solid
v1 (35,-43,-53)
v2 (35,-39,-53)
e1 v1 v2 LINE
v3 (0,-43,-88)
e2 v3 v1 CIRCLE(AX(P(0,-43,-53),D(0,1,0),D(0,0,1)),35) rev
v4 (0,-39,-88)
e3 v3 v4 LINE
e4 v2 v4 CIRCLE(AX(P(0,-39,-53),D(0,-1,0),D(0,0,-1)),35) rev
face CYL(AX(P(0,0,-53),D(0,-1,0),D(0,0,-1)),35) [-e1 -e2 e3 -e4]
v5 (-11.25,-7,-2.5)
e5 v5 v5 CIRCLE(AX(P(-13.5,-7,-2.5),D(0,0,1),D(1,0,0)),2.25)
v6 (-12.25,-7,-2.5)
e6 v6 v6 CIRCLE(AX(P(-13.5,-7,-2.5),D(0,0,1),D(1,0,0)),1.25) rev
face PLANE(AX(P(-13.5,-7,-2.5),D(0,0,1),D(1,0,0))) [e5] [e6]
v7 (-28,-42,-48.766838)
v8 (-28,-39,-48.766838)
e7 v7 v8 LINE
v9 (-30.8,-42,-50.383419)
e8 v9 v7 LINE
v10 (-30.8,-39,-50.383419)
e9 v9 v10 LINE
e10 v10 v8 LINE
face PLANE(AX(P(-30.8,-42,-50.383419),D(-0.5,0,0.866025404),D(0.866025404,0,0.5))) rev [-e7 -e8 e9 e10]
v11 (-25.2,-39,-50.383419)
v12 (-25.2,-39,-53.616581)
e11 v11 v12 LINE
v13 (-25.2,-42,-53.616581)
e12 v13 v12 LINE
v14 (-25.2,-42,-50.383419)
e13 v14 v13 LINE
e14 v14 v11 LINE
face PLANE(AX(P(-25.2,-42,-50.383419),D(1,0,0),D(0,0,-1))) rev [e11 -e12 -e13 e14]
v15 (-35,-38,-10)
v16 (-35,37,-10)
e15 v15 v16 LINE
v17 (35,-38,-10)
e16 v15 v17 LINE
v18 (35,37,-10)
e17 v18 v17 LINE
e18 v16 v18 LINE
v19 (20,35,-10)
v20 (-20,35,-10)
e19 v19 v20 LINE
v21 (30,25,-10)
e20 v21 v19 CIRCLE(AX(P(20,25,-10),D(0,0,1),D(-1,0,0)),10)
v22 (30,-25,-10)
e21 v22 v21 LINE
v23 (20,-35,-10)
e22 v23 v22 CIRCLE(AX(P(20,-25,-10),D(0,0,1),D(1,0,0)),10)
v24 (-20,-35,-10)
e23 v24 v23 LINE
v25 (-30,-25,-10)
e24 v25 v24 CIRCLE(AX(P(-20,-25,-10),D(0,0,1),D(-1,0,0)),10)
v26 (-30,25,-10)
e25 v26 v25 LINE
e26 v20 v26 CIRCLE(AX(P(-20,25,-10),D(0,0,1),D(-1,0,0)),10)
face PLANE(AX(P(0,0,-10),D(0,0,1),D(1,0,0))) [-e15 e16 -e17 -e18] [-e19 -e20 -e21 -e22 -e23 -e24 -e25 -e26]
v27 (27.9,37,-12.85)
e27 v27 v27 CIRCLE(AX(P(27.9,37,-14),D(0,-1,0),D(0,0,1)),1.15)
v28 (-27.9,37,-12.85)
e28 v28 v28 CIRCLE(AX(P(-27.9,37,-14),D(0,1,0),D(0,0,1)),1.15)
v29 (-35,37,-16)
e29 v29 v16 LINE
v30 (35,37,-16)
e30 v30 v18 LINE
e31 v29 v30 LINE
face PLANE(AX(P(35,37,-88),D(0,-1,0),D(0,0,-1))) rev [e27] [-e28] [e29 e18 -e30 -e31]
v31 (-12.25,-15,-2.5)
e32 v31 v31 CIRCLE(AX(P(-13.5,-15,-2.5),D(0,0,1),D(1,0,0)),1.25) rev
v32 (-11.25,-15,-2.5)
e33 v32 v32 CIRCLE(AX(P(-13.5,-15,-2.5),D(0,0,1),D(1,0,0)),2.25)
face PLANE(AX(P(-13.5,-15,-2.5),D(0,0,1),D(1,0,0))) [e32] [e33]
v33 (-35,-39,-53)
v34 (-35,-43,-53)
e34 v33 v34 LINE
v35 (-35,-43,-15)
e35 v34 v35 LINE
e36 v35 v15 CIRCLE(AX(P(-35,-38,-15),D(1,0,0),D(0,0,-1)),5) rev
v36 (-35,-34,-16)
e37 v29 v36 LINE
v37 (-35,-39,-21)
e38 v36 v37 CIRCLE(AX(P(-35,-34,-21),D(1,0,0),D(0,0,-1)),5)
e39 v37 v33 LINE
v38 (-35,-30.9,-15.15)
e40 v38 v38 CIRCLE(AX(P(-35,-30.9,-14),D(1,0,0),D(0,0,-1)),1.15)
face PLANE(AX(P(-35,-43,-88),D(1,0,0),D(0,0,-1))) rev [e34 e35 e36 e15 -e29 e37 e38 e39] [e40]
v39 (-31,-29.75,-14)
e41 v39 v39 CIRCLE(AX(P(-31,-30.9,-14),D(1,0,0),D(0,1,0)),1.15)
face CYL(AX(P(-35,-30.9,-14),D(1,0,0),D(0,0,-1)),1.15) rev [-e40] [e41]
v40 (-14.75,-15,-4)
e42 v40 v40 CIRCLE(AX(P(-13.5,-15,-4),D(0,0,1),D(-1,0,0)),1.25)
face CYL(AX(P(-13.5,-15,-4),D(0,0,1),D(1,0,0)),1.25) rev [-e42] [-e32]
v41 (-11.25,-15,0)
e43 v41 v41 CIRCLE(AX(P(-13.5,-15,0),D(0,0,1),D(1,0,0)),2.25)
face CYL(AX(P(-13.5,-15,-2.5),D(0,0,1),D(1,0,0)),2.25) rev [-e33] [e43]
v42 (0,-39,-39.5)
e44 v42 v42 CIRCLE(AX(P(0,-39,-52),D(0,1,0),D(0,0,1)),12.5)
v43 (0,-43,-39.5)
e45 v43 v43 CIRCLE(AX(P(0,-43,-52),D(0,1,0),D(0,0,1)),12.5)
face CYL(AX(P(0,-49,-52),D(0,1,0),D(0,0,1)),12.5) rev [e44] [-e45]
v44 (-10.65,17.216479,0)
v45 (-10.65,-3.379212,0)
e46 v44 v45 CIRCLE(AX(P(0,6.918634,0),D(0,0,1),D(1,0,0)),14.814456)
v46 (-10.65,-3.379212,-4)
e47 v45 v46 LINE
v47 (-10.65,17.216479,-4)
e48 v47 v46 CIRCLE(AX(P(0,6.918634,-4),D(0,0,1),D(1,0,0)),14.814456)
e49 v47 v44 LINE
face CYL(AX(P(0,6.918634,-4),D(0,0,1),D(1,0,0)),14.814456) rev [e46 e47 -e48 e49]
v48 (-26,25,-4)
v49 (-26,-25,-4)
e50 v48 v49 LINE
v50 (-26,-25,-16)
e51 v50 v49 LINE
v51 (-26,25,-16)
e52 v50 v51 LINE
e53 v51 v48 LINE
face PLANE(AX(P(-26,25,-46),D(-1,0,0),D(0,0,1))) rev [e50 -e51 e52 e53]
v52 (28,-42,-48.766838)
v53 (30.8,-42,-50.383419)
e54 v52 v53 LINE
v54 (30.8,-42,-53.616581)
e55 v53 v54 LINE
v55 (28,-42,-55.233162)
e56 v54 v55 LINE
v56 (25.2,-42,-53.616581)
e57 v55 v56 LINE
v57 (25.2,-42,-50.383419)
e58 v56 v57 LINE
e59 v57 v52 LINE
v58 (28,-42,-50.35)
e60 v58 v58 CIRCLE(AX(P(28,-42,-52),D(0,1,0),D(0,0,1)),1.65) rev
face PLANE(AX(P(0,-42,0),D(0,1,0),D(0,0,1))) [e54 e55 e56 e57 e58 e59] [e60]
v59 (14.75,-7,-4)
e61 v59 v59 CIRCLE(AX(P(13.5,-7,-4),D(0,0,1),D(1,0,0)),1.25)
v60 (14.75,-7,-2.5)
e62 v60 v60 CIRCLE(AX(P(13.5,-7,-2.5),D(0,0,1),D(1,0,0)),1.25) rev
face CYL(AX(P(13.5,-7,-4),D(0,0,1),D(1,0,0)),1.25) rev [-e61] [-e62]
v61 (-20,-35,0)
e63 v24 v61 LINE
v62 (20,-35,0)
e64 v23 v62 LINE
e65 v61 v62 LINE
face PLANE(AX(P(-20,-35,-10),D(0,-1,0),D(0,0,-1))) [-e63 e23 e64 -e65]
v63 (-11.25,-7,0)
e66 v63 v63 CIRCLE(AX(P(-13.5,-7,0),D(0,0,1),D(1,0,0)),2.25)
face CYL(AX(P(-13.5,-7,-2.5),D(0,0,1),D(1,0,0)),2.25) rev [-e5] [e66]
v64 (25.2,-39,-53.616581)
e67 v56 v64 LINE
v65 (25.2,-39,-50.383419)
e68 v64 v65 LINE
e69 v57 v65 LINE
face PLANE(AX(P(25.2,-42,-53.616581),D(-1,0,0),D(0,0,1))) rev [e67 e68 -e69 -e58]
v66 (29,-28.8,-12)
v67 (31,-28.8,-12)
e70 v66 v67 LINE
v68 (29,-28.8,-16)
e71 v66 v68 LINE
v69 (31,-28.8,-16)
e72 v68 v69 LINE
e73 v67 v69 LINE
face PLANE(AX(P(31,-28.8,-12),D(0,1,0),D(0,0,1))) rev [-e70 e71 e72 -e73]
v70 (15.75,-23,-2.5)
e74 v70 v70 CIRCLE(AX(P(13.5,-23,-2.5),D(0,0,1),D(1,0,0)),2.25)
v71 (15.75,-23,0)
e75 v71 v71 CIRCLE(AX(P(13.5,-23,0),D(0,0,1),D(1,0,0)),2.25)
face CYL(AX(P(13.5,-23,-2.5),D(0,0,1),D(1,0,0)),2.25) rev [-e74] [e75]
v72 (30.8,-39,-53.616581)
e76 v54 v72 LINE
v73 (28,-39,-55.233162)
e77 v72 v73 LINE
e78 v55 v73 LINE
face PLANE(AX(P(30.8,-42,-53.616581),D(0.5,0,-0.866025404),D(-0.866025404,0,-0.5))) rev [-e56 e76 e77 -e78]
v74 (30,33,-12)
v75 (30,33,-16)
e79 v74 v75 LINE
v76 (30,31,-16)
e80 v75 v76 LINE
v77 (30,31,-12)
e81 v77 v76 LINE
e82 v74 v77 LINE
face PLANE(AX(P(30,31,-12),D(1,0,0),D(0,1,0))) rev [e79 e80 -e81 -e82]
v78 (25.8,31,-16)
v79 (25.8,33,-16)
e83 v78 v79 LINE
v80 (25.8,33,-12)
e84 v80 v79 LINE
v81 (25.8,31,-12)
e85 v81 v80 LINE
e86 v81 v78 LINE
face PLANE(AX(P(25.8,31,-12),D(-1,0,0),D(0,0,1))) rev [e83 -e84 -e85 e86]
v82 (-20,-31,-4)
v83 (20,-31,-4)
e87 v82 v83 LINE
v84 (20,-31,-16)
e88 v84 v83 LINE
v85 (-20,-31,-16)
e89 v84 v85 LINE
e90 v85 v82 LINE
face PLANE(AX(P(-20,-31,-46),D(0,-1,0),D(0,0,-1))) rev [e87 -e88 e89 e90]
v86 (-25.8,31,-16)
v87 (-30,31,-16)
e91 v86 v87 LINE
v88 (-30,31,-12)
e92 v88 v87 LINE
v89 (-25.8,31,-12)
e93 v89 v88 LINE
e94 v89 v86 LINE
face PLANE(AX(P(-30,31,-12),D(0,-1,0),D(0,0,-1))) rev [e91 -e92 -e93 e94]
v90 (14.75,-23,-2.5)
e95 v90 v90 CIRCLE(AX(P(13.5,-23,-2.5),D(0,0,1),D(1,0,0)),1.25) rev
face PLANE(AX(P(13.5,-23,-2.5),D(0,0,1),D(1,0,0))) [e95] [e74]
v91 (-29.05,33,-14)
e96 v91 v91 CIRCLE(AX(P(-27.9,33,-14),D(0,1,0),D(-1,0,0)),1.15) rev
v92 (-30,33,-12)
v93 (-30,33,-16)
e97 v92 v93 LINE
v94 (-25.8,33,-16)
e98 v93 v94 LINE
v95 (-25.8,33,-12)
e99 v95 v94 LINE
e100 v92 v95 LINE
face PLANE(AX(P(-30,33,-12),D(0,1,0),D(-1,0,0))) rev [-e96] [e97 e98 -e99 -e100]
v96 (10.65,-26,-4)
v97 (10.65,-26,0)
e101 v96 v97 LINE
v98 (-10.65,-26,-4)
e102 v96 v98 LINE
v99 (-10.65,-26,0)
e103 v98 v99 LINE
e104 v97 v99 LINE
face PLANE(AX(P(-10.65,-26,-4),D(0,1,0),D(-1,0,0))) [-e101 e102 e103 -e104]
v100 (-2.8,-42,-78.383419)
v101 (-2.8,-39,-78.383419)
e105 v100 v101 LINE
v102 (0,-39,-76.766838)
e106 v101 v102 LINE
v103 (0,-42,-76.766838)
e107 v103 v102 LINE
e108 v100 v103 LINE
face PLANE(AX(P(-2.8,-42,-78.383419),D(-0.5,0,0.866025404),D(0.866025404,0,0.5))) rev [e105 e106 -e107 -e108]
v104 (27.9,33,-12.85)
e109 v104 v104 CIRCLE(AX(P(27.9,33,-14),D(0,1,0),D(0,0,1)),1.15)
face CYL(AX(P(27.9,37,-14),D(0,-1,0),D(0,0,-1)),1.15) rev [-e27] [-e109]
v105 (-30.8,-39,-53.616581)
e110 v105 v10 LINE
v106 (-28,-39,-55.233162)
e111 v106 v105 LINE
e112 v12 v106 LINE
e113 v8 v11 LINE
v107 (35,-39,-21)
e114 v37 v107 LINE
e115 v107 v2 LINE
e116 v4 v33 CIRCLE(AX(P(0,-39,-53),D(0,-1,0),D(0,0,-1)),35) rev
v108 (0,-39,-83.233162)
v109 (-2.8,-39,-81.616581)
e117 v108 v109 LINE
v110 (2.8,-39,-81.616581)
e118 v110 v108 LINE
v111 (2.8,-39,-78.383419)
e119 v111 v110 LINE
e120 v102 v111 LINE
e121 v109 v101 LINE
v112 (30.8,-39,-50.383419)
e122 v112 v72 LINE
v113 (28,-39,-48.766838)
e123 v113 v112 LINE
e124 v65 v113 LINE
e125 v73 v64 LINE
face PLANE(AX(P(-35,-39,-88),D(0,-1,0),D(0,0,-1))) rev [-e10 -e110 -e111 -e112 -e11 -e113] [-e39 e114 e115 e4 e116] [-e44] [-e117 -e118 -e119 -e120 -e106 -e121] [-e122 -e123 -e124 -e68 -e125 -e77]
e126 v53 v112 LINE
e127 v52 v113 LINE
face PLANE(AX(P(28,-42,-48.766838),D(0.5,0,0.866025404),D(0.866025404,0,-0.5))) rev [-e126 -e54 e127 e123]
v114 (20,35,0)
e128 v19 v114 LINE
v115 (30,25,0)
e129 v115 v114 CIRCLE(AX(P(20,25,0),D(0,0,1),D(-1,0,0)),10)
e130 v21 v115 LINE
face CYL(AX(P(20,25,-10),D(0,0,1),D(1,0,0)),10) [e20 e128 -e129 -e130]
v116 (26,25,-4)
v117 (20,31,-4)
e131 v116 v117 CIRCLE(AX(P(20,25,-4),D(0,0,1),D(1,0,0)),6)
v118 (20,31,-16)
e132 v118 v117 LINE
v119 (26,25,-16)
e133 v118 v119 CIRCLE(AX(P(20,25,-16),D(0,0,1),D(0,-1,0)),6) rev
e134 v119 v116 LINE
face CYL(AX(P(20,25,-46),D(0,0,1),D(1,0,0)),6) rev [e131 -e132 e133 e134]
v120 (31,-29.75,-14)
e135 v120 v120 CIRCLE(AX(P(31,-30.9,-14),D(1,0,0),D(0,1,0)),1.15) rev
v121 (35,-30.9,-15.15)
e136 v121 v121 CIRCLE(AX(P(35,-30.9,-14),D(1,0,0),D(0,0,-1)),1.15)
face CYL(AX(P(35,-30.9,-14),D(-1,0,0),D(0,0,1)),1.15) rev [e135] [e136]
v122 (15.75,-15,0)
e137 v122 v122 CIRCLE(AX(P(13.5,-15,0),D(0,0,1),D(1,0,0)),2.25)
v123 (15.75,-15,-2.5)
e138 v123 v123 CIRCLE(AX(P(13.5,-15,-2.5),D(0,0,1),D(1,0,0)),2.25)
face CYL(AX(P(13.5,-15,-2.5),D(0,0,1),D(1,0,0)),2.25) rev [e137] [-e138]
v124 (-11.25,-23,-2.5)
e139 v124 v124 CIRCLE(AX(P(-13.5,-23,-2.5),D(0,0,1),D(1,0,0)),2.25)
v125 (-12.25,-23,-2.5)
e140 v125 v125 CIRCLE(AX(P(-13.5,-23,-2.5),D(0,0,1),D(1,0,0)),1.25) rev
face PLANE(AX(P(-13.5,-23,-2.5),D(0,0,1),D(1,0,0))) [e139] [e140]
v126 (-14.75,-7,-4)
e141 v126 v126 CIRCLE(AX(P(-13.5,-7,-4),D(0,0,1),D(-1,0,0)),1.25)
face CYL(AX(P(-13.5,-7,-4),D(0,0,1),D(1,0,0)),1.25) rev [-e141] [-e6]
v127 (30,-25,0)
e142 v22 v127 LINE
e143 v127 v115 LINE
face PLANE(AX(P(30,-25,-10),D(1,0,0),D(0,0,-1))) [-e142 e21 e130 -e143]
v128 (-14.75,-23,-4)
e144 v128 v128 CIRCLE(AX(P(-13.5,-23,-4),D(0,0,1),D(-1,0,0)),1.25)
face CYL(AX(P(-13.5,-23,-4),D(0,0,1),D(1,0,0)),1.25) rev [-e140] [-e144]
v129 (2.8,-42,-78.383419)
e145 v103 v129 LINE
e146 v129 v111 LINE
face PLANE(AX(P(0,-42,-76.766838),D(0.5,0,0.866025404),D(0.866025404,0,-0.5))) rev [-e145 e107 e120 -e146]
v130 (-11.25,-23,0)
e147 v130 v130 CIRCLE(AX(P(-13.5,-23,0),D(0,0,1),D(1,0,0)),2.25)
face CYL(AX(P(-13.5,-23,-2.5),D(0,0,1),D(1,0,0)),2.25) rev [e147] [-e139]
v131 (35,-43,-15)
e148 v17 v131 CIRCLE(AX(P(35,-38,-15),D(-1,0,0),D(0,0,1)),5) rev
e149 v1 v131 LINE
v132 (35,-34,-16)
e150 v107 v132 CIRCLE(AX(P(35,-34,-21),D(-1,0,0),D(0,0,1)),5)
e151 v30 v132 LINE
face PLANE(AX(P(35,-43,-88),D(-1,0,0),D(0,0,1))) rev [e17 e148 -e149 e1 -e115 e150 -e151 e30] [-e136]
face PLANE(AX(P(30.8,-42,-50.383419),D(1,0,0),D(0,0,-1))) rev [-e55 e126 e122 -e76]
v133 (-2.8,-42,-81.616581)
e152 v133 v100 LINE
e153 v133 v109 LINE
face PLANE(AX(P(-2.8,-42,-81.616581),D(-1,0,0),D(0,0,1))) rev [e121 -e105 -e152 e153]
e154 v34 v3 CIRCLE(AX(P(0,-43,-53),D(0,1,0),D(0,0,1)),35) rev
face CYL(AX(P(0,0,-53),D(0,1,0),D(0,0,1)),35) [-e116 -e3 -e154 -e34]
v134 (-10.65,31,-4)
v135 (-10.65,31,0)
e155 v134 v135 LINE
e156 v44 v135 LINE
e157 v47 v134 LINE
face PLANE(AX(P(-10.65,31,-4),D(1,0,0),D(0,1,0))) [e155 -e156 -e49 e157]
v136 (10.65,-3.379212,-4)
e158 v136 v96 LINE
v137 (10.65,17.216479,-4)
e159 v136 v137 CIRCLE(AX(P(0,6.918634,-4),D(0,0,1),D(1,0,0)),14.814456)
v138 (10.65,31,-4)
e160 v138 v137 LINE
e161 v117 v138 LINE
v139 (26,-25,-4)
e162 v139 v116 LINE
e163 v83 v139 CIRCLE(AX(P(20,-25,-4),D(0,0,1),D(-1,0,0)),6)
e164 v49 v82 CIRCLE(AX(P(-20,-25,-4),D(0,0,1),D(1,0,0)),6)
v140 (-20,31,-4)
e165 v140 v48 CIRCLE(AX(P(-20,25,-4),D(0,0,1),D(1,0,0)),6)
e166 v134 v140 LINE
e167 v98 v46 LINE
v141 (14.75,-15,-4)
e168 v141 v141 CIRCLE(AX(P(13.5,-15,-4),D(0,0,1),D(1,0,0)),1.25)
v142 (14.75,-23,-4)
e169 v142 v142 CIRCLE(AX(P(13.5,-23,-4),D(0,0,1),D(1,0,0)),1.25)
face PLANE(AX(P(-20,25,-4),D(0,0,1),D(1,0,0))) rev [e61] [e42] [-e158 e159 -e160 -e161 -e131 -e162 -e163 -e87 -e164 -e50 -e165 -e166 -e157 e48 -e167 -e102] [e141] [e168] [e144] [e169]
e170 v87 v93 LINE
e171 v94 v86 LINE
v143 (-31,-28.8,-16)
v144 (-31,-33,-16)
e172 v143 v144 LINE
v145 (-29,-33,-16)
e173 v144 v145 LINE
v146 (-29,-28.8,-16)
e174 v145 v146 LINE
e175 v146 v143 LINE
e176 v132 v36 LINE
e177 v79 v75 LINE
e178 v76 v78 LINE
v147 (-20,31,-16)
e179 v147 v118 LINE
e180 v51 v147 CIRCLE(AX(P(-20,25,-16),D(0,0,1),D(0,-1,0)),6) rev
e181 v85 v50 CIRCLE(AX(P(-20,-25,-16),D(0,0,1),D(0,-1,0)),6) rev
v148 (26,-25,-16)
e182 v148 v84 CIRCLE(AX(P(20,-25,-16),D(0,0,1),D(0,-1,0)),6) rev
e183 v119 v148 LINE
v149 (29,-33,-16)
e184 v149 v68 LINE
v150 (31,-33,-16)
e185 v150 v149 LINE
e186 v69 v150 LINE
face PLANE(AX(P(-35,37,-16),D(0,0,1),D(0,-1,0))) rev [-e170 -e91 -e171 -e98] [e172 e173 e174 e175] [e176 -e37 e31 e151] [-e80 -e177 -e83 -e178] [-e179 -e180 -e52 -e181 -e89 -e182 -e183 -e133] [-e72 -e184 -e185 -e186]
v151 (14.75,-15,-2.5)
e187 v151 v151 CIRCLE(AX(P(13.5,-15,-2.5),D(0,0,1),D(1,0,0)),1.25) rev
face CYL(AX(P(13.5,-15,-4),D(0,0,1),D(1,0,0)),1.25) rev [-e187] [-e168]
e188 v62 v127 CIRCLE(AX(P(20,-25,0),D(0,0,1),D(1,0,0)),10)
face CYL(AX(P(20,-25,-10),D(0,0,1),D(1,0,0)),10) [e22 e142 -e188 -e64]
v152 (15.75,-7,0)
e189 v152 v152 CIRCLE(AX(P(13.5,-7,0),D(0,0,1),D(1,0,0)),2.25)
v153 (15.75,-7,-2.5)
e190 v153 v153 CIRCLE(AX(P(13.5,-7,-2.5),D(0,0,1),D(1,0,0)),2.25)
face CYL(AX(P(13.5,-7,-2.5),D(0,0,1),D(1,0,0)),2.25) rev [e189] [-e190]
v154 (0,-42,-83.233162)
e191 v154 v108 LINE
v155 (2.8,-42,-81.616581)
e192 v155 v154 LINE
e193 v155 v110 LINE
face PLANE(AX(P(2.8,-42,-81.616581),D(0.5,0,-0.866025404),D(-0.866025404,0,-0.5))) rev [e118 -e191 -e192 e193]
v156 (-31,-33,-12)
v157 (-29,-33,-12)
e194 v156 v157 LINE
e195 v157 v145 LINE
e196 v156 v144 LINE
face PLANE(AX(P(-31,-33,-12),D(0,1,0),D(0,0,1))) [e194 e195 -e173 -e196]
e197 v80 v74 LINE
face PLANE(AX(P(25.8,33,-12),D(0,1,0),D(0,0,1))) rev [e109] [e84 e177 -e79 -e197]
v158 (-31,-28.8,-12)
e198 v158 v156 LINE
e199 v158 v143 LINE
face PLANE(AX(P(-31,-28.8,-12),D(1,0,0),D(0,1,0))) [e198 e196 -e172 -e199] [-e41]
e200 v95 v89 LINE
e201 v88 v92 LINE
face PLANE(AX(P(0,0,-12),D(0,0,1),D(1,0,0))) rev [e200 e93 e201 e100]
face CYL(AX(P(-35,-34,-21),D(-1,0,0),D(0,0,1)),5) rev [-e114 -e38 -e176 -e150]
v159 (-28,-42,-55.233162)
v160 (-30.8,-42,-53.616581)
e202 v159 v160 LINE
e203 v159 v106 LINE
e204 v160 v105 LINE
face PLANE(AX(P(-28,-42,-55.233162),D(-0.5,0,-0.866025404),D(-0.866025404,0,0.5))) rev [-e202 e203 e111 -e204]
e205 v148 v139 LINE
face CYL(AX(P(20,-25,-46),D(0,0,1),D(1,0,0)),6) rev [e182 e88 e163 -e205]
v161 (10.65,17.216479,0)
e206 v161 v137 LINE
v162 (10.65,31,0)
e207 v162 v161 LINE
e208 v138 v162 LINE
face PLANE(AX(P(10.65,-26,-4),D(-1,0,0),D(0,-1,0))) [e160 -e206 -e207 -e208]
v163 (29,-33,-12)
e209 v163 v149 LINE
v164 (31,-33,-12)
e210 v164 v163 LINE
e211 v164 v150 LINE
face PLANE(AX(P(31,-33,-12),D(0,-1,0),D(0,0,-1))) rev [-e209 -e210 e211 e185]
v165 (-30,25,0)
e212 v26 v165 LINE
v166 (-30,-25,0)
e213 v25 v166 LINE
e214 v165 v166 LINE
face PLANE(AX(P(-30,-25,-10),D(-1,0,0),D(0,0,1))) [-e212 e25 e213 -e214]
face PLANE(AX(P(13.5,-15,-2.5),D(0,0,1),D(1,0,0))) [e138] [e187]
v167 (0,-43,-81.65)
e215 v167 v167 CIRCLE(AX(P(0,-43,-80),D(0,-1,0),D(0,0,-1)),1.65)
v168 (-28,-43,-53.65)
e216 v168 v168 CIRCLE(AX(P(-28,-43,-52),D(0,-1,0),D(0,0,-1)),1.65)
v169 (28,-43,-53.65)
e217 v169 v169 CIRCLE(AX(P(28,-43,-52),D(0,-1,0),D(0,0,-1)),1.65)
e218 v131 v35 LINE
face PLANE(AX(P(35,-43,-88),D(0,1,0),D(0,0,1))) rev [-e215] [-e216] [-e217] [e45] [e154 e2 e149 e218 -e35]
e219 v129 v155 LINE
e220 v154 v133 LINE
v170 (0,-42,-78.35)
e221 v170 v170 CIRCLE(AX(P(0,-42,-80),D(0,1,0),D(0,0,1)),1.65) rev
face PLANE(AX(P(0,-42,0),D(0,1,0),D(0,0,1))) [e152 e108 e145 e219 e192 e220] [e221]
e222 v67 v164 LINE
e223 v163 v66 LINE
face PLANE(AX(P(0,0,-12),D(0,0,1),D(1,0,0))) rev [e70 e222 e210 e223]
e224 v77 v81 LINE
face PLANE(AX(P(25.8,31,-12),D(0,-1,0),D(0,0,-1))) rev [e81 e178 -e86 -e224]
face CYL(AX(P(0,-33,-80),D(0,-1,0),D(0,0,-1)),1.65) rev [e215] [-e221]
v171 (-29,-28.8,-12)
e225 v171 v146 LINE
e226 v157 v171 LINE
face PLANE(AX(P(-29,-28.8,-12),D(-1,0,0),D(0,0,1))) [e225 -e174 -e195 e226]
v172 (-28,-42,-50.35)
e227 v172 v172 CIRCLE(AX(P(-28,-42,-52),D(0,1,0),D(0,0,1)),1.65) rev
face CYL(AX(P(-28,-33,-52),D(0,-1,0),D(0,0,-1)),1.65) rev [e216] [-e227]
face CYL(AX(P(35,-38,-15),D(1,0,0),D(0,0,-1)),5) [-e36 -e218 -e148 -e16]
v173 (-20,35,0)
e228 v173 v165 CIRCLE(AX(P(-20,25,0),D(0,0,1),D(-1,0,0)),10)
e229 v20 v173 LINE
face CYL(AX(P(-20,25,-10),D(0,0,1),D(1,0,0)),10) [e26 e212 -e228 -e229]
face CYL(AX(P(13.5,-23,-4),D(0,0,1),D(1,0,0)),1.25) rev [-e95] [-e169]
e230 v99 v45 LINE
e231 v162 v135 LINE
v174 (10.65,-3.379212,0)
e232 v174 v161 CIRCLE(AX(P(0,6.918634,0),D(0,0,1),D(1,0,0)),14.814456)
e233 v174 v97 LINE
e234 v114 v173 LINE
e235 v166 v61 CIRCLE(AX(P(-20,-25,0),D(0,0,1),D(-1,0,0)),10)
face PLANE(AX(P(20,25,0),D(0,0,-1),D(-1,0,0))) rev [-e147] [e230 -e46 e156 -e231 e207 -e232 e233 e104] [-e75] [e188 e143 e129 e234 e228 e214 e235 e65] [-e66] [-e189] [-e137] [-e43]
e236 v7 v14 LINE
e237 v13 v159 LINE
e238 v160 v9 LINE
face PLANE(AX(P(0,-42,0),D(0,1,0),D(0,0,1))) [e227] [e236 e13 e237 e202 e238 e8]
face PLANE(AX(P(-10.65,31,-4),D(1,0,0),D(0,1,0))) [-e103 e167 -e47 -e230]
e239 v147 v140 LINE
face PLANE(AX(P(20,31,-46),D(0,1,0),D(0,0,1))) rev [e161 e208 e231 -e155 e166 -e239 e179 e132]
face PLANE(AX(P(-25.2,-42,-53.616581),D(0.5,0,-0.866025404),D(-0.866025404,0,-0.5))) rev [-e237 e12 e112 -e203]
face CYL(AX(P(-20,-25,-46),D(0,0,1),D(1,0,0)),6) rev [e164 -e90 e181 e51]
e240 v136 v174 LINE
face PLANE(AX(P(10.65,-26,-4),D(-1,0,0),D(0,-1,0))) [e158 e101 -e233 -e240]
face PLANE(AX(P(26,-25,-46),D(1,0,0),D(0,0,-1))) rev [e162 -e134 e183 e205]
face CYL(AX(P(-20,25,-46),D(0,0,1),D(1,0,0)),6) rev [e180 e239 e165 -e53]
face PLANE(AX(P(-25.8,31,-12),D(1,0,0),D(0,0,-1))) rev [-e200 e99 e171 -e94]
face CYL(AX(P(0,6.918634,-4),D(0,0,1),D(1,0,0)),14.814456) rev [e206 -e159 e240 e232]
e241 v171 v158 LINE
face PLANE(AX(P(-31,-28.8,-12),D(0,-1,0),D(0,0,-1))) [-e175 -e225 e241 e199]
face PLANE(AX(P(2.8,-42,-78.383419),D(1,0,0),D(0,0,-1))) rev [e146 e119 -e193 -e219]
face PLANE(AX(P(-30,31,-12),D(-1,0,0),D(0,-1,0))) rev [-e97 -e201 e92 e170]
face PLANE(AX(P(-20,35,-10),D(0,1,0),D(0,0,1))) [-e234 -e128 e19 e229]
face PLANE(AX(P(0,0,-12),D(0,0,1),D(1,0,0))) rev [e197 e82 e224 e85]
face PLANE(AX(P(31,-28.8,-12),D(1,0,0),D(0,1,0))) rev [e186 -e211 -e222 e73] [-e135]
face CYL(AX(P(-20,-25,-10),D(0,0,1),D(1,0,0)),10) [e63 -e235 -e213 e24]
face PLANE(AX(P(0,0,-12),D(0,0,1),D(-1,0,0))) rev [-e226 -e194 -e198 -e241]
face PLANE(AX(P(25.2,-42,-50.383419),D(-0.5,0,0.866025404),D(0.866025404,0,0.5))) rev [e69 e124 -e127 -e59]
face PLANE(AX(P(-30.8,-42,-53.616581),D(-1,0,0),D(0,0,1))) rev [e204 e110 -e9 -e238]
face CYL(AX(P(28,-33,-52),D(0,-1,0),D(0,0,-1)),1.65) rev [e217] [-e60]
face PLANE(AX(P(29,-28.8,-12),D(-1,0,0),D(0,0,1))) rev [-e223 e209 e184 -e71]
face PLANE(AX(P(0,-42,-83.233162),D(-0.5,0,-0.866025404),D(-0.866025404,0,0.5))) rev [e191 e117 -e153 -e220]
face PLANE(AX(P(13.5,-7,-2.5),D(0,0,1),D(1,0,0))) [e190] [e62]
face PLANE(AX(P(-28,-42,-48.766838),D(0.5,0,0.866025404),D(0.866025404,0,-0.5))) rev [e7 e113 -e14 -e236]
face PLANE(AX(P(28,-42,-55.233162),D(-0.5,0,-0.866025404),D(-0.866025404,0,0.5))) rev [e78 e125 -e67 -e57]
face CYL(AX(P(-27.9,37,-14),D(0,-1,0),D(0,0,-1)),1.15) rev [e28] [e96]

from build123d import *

# Parameters (mm, degrees)
BOSS_EXTRUDE1_DEPTH = 10
SKETCH10_W          = 70
SKETCH10_H          = 80
BOSS_EXTRUDE6_DEPTH = 78
CUT_EXTRUDE7_DEPTH  = 46
SKETCH15_R          = 1.25
BOSS_EXTRUDE7_DEPTH = 4
SKETCH17_R          = 2.25
CUT_EXTRUDE9_DEPTH  = 2.5
SKETCH19_W          = 72
SKETCH19_H          = 76
CUT_EXTRUDE11_DEPTH = 70
SKETCH20_R          = 1.65
CUT_EXTRUDE12_DEPTH = 10
SKETCH21_R          = 12.5
CUT_EXTRUDE13_DEPTH = 10
CUT_EXTRUDE14_DEPTH = 3
FILLET3_R           = 5
SKETCH23_W          = 2
SKETCH23_H          = 4.2
CUT_EXTRUDE15_DEPTH = 4
SKETCH24_R          = 1.15
CUT_EXTRUDE16_DEPTH = 118
SKETCH27_W          = 4.2
SKETCH27_H          = 2
CUT_EXTRUDE17_DEPTH = 4
SKETCH28_R          = 1.15
CUT_EXTRUDE18_DEPTH = 121.187353744
FILLET4_R           = 35
SKETCH29_R          = 14.814456412
CUT_EXTRUDE19_DEPTH = 4


with BuildPart() as part:
    # Sketch1 → Boss-Extrude1 (new body)
    with BuildSketch(Plane.XY):
        with BuildLine():
            Line((-20, -35), (20, -35))
            ThreePointArc((20, -35), (27.071067812, -32.071067812), (30, -25))
            Line((30, -25), (30, 25))
            ThreePointArc((30, 25), (27.071067812, 32.071067812), (20, 35))
            Line((20, 35), (-20, 35))
            ThreePointArc((-20, 35), (-27.071067812, 32.071067812), (-30, 25))
            Line((-30, 25), (-30, -25))
            ThreePointArc((-30, -25), (-27.071067812, -32.071067812), (-20, -35))
        make_face()
    extrude(amount=-BOSS_EXTRUDE1_DEPTH)

    # Sketch10 → Boss-Extrude6 (add)
    with BuildSketch(Plane(origin=(0, 0, -10), x_dir=(-1, 0, 0), z_dir=(0, 0, -1))):
        with Locations((0, -3)):
            Rectangle(SKETCH10_W, SKETCH10_H)
    extrude(amount=BOSS_EXTRUDE6_DEPTH)

    # Sketch14 → Cut-Extrude7 (cut)
    with BuildSketch(Plane.XY):
        with BuildLine():
            Line((20, 31), (-20, 31))
            ThreePointArc((-20, 31), (-24.242640687, 29.242640687), (-26, 25))
            Line((-26, 25), (-26, -25))
            ThreePointArc((-26, -25), (-24.242640687, -29.242640687), (-20, -31))
            Line((-20, -31), (20, -31))
            ThreePointArc((20, -31), (24.242640687, -29.242640687), (26, -25))
            Line((26, -25), (26, 25))
            ThreePointArc((26, 25), (24.242640687, 29.242640687), (20, 31))
        make_face()
    extrude(amount=-CUT_EXTRUDE7_DEPTH, mode=Mode.SUBTRACT)

    # Sketch15 → Boss-Extrude7 (add)
    with BuildSketch(Plane.XY):
        with BuildLine():
            Line((-20, 31), (-10.65, 31))
            Line((-10.65, 31), (-10.65, -26))
            Line((-10.65, -26), (10.65, -26))
            Line((10.65, -26), (10.65, 31))
            Line((10.65, 31), (20, 31))
            ThreePointArc((20, 31), (24.242640687, 29.242640687), (26, 25))
            Line((26, 25), (26, -25))
            ThreePointArc((26, -25), (24.242640687, -29.242640687), (20, -31))
            Line((20, -31), (-20, -31))
            ThreePointArc((-20, -31), (-24.242640687, -29.242640687), (-26, -25))
            Line((-26, -25), (-26, 25))
            ThreePointArc((-26, 25), (-24.242640687, 29.242640687), (-20, 31))
        make_face()
        with Locations((13.5, -7)):
            Circle(SKETCH15_R, mode=Mode.SUBTRACT)
        with Locations((13.5, -15)):
            Circle(SKETCH15_R, mode=Mode.SUBTRACT)
        with Locations((13.5, -23)):
            Circle(SKETCH15_R, mode=Mode.SUBTRACT)
        with Locations(Location((-13.5, -7, 0), (0, 0, 180))):
            Circle(SKETCH15_R, mode=Mode.SUBTRACT)
        with Locations(Location((-13.5, -15, 0), (0, 0, 180))):
            Circle(SKETCH15_R, mode=Mode.SUBTRACT)
        with Locations(Location((-13.5, -23, 0), (0, 0, 180))):
            Circle(SKETCH15_R, mode=Mode.SUBTRACT)
    extrude(amount=-BOSS_EXTRUDE7_DEPTH)

    # Sketch17 → Cut-Extrude9 (cut)
    with BuildSketch(Plane.XY):
        with Locations((-13.5, -7)):
            Circle(SKETCH17_R)
        with Locations((-13.5, -15)):
            Circle(SKETCH17_R)
        with Locations((-13.5, -23)):
            Circle(SKETCH17_R)
        with Locations((13.5, -7)):
            Circle(SKETCH17_R)
        with Locations((13.5, -15)):
            Circle(SKETCH17_R)
        with Locations((13.5, -23)):
            Circle(SKETCH17_R)
    extrude(amount=-CUT_EXTRUDE9_DEPTH, mode=Mode.SUBTRACT)

    # Sketch19 → Cut-Extrude11 (cut)
    with BuildSketch(Plane(origin=(35, 0, 0), x_dir=(0, 0, -1), z_dir=(1, 0, 0))):
        with Locations((52, -1)):
            Rectangle(SKETCH19_W, SKETCH19_H)
    extrude(amount=-CUT_EXTRUDE11_DEPTH, mode=Mode.SUBTRACT)

    # Sketch20 → Cut-Extrude12 (cut)
    with BuildSketch(Plane.XZ.offset(43)):
        with Locations(Location((28, -52, 0), (0, 0, 270))):
            Circle(SKETCH20_R)
        with Locations(Location((0, -80, 0), (0, 0, 270))):
            Circle(SKETCH20_R)
        with Locations(Location((-28, -52, 0), (0, 0, 270))):
            Circle(SKETCH20_R)
    extrude(amount=-CUT_EXTRUDE12_DEPTH, mode=Mode.SUBTRACT)

    # Sketch21 → Cut-Extrude13 (cut)
    with BuildSketch(Plane(origin=(0, -39, 0), x_dir=(1, 0, 0), z_dir=(0, 1, 0))):
        with Locations(Location((0, 52, 0), (0, 0, 270))):
            Circle(SKETCH21_R)
    extrude(amount=-CUT_EXTRUDE13_DEPTH, mode=Mode.SUBTRACT)

    # Sketch22 → Cut-Extrude14 (cut)
    with BuildSketch(Plane(origin=(0, -39, 0), x_dir=(1, 0, 0), z_dir=(0, 1, 0))):
        Polygon((0, 83.233161507), (-2.8, 81.616580754), (-2.8, 78.383419246), (0, 76.766838493), (2.8, 78.383419246), (2.8, 81.616580754), align=None)
        Polygon((-30.8, 50.383419246), (-28, 48.766838493), (-25.2, 50.383419246), (-25.2, 53.616580754), (-28, 55.233161507), (-30.8, 53.616580754), align=None)
        Polygon((28, 55.233161507), (25.2, 53.616580754), (25.2, 50.383419246), (28, 48.766838493), (30.8, 50.383419246), (30.8, 53.616580754), align=None)
    extrude(amount=-CUT_EXTRUDE14_DEPTH, mode=Mode.SUBTRACT)

    # Fillet3
    fillet3_edges = [part.edges().sort_by_distance(p)[0] for p in [
        (0, -39, -16),
        (0, -43, -10),
    ]]
    fillet(fillet3_edges, radius=FILLET3_R)

    # Sketch23 → Cut-Extrude15 (cut)
    with BuildSketch(Plane(origin=(0, 0, -16), x_dir=(-1, 0, 0), z_dir=(0, 0, -1))):
        with Locations((-30, -30.9)):
            Rectangle(SKETCH23_W, SKETCH23_H)
    cut_extrude15 = extrude(amount=-CUT_EXTRUDE15_DEPTH, mode=Mode.SUBTRACT)

    # Sketch24 → Cut-Extrude16 (cut, through all)
    with BuildSketch(Plane(origin=(29, 0, 0), x_dir=(0, 0, -1), z_dir=(1, 0, 0))):
        with Locations(Location((14, -30.9, 0), (0, 0, 90))):
            Circle(SKETCH24_R)
    cut_extrude16 = extrude(amount=CUT_EXTRUDE16_DEPTH, mode=Mode.SUBTRACT)

    # Mirror1: Cut-Extrude15, Cut-Extrude16 across plane
    add(cut_extrude15.mirror(Plane(origin=(0, 0, 0), x_dir=(0, 0, 1), z_dir=(1, 0, 0))), mode=Mode.SUBTRACT)
    add(cut_extrude16.mirror(Plane(origin=(0, 0, 0), x_dir=(0, 0, 1), z_dir=(1, 0, 0))), mode=Mode.SUBTRACT)

    # Sketch27 → Cut-Extrude17 (cut)
    with BuildSketch(Plane(origin=(0, 0, -16), x_dir=(-1, 0, 0), z_dir=(0, 0, -1))):
        with Locations((27.9, 32)):
            Rectangle(SKETCH27_W, SKETCH27_H)
        with Locations((-27.9, 32)):
            Rectangle(SKETCH27_W, SKETCH27_H)
    extrude(amount=-CUT_EXTRUDE17_DEPTH, mode=Mode.SUBTRACT)

    # Sketch28 → Cut-Extrude18 (cut, through all)
    with BuildSketch(Plane(origin=(0, 31, 0), x_dir=(1, 0, 0), z_dir=(0, 1, 0))):
        with Locations(Location((-27.9, 14, 0), (0, 0, 180))):
            Circle(SKETCH28_R)
    cut_extrude18 = extrude(amount=CUT_EXTRUDE18_DEPTH, mode=Mode.SUBTRACT)

    # Mirror2: Cut-Extrude18 across plane
    add(cut_extrude18.mirror(Plane(origin=(0, 0, 0), x_dir=(0, 0, 1), z_dir=(1, 0, 0))), mode=Mode.SUBTRACT)

    # Fillet4
    fillet4_edges = [part.edges().sort_by_distance(p)[0] for p in [
        (35, -41, -88),
        (-35, -41, -88),
    ]]
    fillet(fillet4_edges, radius=FILLET4_R - 0.0001)  # a hair under: the kernel refuses the full size

    # Sketch29 → Cut-Extrude19 (cut)
    with BuildSketch(Plane.XY):
        with Locations((0, 6.918633542)):
            Circle(SKETCH29_R)
    extrude(amount=-CUT_EXTRUDE19_DEPTH, mode=Mode.SUBTRACT)


solid = part.part
